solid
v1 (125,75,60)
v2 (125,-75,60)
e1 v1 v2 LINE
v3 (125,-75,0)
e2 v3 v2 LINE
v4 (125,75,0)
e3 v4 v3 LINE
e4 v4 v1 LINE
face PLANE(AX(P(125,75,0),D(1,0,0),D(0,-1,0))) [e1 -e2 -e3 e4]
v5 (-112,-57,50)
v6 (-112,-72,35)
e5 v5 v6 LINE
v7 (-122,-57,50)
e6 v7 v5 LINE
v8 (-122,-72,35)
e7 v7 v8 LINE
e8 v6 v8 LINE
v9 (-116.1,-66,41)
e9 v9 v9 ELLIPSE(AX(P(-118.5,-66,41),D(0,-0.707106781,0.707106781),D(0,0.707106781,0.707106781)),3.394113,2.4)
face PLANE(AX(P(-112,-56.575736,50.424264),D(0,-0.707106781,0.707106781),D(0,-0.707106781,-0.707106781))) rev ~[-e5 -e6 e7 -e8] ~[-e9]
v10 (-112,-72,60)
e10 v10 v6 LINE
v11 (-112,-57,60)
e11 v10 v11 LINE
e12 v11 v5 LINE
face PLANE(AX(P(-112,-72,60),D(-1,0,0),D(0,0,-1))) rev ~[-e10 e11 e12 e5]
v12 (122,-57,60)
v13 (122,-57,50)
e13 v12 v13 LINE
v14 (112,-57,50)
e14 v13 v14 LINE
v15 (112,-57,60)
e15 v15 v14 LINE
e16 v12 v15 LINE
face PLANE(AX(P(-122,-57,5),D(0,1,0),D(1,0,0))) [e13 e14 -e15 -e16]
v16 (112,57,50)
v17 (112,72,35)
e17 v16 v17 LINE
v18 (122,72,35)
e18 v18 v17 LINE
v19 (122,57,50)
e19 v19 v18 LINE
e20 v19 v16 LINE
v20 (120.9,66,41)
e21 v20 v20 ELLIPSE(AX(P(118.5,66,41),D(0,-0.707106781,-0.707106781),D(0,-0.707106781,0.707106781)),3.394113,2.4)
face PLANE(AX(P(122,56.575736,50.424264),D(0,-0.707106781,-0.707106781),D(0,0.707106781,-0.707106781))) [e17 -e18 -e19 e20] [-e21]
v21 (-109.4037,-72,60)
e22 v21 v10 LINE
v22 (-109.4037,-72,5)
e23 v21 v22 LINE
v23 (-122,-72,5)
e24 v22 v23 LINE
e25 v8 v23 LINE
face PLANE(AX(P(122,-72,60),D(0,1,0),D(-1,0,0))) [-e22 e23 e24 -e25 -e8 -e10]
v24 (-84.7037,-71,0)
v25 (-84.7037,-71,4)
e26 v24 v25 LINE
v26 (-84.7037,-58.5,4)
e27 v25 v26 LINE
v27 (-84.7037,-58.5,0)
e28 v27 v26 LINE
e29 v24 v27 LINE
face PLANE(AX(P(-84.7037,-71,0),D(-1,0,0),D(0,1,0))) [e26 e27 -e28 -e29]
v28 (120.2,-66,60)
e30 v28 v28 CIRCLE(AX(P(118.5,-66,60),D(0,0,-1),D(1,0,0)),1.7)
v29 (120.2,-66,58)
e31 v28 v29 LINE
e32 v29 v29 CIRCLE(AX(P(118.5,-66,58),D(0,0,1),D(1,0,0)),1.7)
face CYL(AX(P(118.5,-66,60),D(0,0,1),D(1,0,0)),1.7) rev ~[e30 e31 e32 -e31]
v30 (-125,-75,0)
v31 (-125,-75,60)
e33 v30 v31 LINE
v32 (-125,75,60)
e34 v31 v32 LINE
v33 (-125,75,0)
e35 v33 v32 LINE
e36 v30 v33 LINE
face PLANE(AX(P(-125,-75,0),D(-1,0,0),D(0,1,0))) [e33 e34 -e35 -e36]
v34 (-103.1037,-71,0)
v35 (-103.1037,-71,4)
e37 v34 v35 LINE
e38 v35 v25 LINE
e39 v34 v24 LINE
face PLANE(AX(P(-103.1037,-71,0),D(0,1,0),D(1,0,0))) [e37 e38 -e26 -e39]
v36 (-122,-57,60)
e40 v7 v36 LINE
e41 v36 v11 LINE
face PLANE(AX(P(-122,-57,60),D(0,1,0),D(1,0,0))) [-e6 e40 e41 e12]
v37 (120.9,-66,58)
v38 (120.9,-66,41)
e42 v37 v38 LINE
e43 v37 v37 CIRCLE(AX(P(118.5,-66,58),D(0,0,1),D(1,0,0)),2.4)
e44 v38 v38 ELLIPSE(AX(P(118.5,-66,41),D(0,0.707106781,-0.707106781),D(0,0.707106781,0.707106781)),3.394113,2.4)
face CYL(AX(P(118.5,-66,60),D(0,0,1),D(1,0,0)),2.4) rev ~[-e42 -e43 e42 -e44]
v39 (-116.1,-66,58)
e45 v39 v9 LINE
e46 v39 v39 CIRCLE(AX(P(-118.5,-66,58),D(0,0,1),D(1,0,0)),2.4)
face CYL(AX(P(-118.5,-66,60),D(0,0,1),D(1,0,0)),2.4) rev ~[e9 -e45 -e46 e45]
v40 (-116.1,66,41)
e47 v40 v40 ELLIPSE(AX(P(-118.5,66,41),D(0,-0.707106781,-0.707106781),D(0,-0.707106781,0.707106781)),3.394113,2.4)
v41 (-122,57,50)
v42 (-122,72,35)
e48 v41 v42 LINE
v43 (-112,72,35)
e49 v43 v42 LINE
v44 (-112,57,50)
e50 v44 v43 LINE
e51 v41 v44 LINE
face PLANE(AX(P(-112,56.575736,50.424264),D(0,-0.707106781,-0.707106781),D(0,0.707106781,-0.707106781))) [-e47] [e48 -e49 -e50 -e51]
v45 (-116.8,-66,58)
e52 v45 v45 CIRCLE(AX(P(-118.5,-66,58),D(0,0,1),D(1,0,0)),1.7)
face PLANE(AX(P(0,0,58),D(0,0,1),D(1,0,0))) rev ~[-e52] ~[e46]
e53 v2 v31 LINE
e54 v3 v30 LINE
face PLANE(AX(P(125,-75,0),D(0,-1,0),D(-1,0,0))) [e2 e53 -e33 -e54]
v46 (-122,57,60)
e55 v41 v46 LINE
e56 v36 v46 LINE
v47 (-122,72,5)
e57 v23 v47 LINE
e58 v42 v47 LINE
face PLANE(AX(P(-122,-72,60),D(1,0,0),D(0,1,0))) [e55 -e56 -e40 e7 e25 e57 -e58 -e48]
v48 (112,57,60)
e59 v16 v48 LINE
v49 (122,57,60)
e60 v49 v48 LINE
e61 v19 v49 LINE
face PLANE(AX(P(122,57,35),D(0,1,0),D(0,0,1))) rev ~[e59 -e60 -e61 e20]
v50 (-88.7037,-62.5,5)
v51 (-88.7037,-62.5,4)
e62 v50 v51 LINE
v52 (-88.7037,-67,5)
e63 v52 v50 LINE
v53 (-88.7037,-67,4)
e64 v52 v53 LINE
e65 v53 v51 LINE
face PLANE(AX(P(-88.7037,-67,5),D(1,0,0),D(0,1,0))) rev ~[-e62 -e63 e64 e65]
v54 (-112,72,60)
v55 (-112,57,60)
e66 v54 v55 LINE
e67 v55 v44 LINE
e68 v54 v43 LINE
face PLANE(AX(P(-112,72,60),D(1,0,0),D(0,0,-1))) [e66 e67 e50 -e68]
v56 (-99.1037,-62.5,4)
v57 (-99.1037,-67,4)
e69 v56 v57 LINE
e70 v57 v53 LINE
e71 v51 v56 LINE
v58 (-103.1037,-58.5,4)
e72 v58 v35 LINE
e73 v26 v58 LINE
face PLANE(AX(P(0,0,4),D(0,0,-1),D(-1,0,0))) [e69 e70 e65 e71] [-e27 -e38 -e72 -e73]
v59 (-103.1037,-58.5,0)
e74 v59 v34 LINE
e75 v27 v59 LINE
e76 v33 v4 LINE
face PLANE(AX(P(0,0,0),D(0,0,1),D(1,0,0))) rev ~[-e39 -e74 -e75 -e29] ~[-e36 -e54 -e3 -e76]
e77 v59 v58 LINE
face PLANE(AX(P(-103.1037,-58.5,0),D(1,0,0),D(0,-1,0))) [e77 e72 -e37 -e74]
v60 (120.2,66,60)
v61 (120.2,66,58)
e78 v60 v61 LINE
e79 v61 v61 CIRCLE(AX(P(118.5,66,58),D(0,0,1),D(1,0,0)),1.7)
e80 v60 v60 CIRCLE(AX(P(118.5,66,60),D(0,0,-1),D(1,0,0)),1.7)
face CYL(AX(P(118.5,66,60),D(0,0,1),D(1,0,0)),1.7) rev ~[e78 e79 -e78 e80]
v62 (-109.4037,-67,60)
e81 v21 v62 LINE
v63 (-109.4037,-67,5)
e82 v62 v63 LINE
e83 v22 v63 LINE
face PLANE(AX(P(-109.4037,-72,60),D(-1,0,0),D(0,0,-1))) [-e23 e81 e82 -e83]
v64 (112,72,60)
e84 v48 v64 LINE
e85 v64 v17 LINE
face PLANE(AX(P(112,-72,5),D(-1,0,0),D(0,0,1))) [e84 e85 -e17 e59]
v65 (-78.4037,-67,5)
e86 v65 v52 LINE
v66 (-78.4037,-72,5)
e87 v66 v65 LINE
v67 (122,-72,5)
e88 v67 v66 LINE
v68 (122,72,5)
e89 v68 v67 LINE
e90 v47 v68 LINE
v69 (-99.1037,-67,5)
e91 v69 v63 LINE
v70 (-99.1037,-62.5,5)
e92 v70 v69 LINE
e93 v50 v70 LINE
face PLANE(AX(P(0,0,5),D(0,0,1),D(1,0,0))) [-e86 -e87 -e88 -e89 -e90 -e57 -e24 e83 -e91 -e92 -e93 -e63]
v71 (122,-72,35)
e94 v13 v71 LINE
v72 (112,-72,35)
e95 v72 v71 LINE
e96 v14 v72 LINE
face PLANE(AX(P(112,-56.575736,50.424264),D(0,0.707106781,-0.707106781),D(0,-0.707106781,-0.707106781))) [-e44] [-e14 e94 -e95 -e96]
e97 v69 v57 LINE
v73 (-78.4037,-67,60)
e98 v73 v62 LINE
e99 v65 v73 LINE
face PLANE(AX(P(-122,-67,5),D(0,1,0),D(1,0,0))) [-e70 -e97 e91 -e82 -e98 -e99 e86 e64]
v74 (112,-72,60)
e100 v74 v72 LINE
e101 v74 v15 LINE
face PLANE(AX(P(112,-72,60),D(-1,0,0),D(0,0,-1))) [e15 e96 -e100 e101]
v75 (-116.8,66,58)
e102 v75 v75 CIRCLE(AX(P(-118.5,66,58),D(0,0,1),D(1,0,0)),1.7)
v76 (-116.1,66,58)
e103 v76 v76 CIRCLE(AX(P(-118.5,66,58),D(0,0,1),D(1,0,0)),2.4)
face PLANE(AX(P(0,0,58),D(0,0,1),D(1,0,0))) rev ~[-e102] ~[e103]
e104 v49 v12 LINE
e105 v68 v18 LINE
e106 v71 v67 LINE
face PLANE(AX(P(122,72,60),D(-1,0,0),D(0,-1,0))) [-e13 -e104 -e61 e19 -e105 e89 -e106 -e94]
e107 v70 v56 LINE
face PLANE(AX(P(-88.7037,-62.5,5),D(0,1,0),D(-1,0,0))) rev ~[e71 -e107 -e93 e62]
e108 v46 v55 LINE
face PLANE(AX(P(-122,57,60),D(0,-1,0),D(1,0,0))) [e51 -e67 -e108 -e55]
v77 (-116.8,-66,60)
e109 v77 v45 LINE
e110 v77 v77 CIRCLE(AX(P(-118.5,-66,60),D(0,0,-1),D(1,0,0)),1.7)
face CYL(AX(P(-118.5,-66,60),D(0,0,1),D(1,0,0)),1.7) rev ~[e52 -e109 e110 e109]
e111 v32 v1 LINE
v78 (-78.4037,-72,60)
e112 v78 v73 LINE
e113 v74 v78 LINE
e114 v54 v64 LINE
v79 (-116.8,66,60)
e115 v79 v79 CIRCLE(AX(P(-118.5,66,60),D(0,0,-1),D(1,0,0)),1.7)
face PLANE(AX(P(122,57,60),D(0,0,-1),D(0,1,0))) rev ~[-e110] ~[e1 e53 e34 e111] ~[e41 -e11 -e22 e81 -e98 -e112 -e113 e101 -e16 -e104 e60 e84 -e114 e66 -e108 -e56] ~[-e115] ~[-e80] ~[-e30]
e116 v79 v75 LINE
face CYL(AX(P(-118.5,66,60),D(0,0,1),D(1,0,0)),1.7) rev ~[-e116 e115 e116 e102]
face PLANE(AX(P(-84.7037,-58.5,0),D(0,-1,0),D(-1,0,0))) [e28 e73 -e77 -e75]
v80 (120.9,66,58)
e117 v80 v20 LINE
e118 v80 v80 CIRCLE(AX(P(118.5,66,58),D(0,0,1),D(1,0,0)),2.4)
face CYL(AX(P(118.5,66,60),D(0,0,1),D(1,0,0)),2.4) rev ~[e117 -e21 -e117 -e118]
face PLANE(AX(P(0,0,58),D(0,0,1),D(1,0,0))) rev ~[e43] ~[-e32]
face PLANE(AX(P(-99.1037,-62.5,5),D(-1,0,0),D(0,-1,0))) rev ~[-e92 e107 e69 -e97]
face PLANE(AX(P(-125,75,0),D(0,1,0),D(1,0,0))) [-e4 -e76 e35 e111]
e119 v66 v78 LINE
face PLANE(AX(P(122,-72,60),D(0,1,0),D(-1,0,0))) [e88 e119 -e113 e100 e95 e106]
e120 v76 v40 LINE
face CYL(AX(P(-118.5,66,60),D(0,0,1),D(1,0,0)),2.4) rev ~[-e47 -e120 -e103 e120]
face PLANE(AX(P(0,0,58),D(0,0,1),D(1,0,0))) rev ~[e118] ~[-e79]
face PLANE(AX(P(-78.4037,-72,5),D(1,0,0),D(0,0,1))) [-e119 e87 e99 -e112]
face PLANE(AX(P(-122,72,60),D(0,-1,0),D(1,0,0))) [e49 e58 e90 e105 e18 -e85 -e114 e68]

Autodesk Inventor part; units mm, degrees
ref_plane "YZ Plane" through (0, 0, 0) normal (1, 0, 0) x (0, 1, 0)
ref_plane "XZ Plane" through (0, 0, 0) normal (0, 1, 0) x (-1, 0, 0)
ref_plane "XY Plane" through (0, 0, 0) normal (0, 0, 1) x (1, 0, 0)
sketch "Sketch7" plane through (0, 0, 0) normal (0, 0, 1) x (1, 0, 0)
  line L0 (125, -75) -> (-125, -75)
  line L1 (-125, -75) -> (-125, 75)
  line L2 (-125, 75) -> (125, 75)
  line L3 (125, 75) -> (125, -75)
  line L4 (125, -75) -> (-125, 75) construction
  line L5 (-125, -75) -> (125, 75) construction
  point P0 (0, 0)
  dimension "d15" = 250
  dimension "d16" = 150
extrude "Box Outside" add sketch "Sketch7" along normal blind 60
sketch "Sketch8" plane through (0, 0, 60) normal (0, 0, 1) x (1, 0, 0)
  line L0 (-122, 72) -> (122, 72)
  line L1 (122, 72) -> (122, -72)
  line L2 (122, -72) -> (-122, -72)
  line L3 (-122, -72) -> (-122, 72)
  line L4 (125, 75) -> (-125, 75) projected
  line L5 (-125, 75) -> (-125, -75) projected
  line L6 (-125, -75) -> (125, -75) projected
  line L7 (125, -75) -> (125, 75) projected
  point P0 (0, 0)
  dimension "d19" = 3
  dimension "d20" = 3
  dimension "d21" = 3
  dimension "d22" = 3
extrude "Box Cut" cut sketch "Sketch8" against normal blind 55 contours L0 L1 L2 L3
sketch "Sketch9" plane through (-122, -72, 60) normal (0, 1, 0) x (1, 0, 0)
  line L0 (0, 0) -> (10, 0)
  line L1 (10, 0) -> (10, 25)
  line L2 (10, 25) -> (0, 25)
  line L3 (0, 25) -> (0, 0)
  point P0 (122, 60)
  dimension "d25" = 10
  dimension "d26" = 25
extrude "ScrewHole Box LB" add sketch "Sketch9" along normal blind 15
sketch "Sketch10" plane through (-122, -72, 5) normal (0, 1, 0) x (1, 0, 0)
  line L0 (244, -55) -> (244, 0) projected
  line L1 (244, -55) -> (234, -55)
  line L2 (234, -55) -> (234, -30)
  line L3 (234, -30) -> (244, -30)
  line L4 (244, -30) -> (244, -55)
  point P0 (122, 5)
  dimension "d29" = 10
  dimension "d30" = 25
extrude "ScrewHole Box RB" add sketch "Sketch10" along normal blind 15
sketch "Sketch11" plane through (-122, 72, 60) normal (0, -1, 0) x (1, 0, 0)
  line L0 (0, 0) -> (244, 0) projected
  line L1 (0, 0) -> (10, 0)
  line L2 (10, 0) -> (10, -25)
  line L3 (10, -25) -> (0, -25)
  line L4 (0, -25) -> (0, 0)
  point P0 (122, -60)
  dimension "d33" = 10
  dimension "d34" = 25
extrude "ScrewHole Box LU" add sketch "Sketch11" along normal blind 15
sketch "Sketch13" plane through (122, -72, 5) normal (-1, 0, 0) x (0, 0, 1)
  line L0 (55, 144) -> (0, 144) projected
  line L1 (55, 144) -> (30, 144)
  line L2 (30, 144) -> (30, 129)
  line L3 (30, 129) -> (55, 129)
  line L4 (55, 129) -> (55, 144)
  point P0 (-5, 72)
  dimension "d37" = 25
  dimension "d38" = 15
extrude "ScrewHole Box RU" add sketch "Sketch13" along normal blind 10
sketch "Sketch27" plane through (0, 0, 60) normal (0, 0, 1) x (1, 0, 0)
  line L0 (-112, -72) -> (-112, -57) projected
  line L1 (-125, 75) -> (-125, -75) projected
  line L2 (-112, -57) -> (-125, -57)
  line L3 (-125, -57) -> (-125, -75)
  line L4 (-125, -75) -> (-112, -75)
  line L5 (-112, -75) -> (-112, -57)
  line L6 (-112, -57) -> (-125, -75)
  line L7 (-112, -75) -> (-125, -57)
  circle A0 centre (-118.5, -66) radius 2.4
  point P0 (0, 0)
  dimension "d84" = 4.8
extrude "Outside ScrewHole LB" cut sketch "Sketch27" against normal blind 26 contours A0 L7 L6 | L6 L7 A0 | A0 L6 L7 | L7 L6 A0
sketch "Sketch29" plane through (0, 0, 60) normal (0, 0, 1) x (1, 0, 0)
  line L0 (-112, -72) -> (-112, -57) projected
  line L1 (-125, -75) -> (125, -75) projected
  line L2 (-112, -57) -> (-125, -57)
  line L3 (-125, -57) -> (-125, -75)
  line L4 (-125, -75) -> (-112, -75)
  line L5 (-112, -75) -> (-112, -57)
  line L6 (-112, -57) -> (-125, -75)
  circle A0 centre (-118.5, -66) radius 2.4
  point P0 (0, 0)
extrude "ScrewRibbon LB" add sketch "Sketch29" against normal blind 2 contours A0 L6 | L6 A0
sketch "Sketch30" plane through (0, 0, 60) normal (0, 0, 1) x (1, 0, 0)
  line L0 (-122, -57) -> (-112, -57) projected
  line L1 (-125, -75) -> (125, -75) projected
  line L2 (-112, -57) -> (-125, -57)
  line L3 (-125, -57) -> (-125, -75)
  line L4 (-125, -75) -> (-112, -75)
  line L5 (-112, -75) -> (-112, -57)
  line L6 (-112, -57) -> (-125, -75)
  circle A0 centre (-118.5, -66) radius 1.7
  point P0 (0, 0)
  dimension "d92" = 3.4
extrude "Inside ScrewHole LB" cut sketch "Sketch30" against normal blind 24 contours A0 L6 | L6 A0
sketch "Sketch31" plane through (0, 0, 60) normal (0, 0, 1) x (1, 0, 0)
  line L0 (-125, 75) -> (-125, -75) projected
  line L1 (-112, 57) -> (-122, 57) projected
  line L2 (-125, 75) -> (-112, 75)
  line L3 (-112, 75) -> (-112, 57)
  line L4 (-112, 57) -> (-125, 57)
  line L5 (-125, 57) -> (-125, 75)
  line L6 (-125, 75) -> (-112, 57)
  circle A0 centre (-118.5, 66) radius 2.4
  point P0 (0, 0)
  dimension "d95" = 4.8
extrude "Outside ScrewHole LU" cut sketch "Sketch31" against normal blind 24 contours A0 L6 | L6 A0
sketch "Sketch32" plane through (0, 0, 60) normal (0, 0, 1) x (1, 0, 0)
  line L0 (-122, 57) -> (-112, 57) projected
  line L1 (-125, 75) -> (-125, -75) projected
  line L2 (-112, 57) -> (-125, 57)
  line L3 (-125, 57) -> (-125, 75)
  line L4 (-125, 75) -> (-112, 75)
  line L5 (-112, 75) -> (-112, 57)
  line L6 (-112, 75) -> (-125, 57)
  circle A0 centre (-118.5, 66) radius 2.4
  point P0 (0, 0)
  dimension "d98" = 4.8
extrude "ScrewRibbon LU" add sketch "Sketch32" against normal blind 2 contours A0 L6 | L6 A0
sketch "Sketch33" plane through (0, 0, 60) normal (0, 0, 1) x (1, 0, 0)
  line L0 (125, 75) -> (-125, 75) projected
  line L1 (-112, 57) -> (-122, 57) projected
  line L2 (-125, 75) -> (-112, 75)
  line L3 (-112, 75) -> (-112, 57)
  line L4 (-112, 57) -> (-125, 57)
  line L5 (-125, 57) -> (-125, 75)
  line L6 (-125, 75) -> (-112, 57)
  circle A0 centre (-118.5, 66) radius 1.7
  point P0 (0, 0)
  dimension "d101" = 3.4
extrude "Inside ScrewHole LU" cut sketch "Sketch33" against normal blind 21.75 contours A0 L6 | L6 A0
sketch "Sketch34" plane through (0, 0, 60) normal (0, 0, 1) x (1, 0, 0)
  line L0 (112, 57) -> (112, 72) projected
  line L1 (125, 75) -> (-125, 75) projected
  line L2 (112, 57) -> (125, 57)
  line L3 (125, 57) -> (125, 75)
  line L4 (125, 75) -> (112, 75)
  line L5 (112, 75) -> (112, 57)
  line L6 (125, 75) -> (112, 57)
  circle A0 centre (118.5, 66) radius 2.4
  point P0 (0, 0)
  dimension "d104" = 4.8
extrude "Outside ScrewHole RU" cut sketch "Sketch34" against normal blind 37 contours A0 L6 | L6 A0
sketch "Sketch35" plane through (0, 0, 60) normal (0, 0, 1) x (1, 0, 0)
  line L0 (125, -75) -> (125, 75) projected
  line L1 (122, 57) -> (112, 57) projected
  line L2 (125, 75) -> (112, 75)
  line L3 (112, 75) -> (112, 57)
  line L4 (112, 57) -> (125, 57)
  line L5 (125, 57) -> (125, 75)
  line L6 (125, 75) -> (-125, 75) projected
  line L7 (125, 75) -> (112, 57)
  circle A0 centre (118.5, 66) radius 2.4
  point P0 (0, 0)
  dimension "d107" = 4.8
extrude "ScrewRibbon RU" add sketch "Sketch35" against normal blind 2 contours A0 L7 | L7 A0
sketch "Sketch36" plane through (0, 0, 60) normal (0, 0, 1) x (1, 0, 0)
  line L0 (122, 57) -> (112, 57) projected
  line L1 (125, -75) -> (125, 75) projected
  line L2 (112, 57) -> (125, 57)
  line L3 (125, 57) -> (125, 75)
  line L4 (125, 75) -> (112, 75)
  line L5 (112, 75) -> (112, 57)
  line L6 (112, 57) -> (125, 75)
  circle A0 centre (118.5, 66) radius 2.4 projected
  circle A1 centre (118.5, 66) radius 1.7
  point P0 (0, 0)
  dimension "d110" = 3.4
extrude "Inside ScrewHole RU" cut sketch "Sketch36" against normal blind 20 contours A1 L6 | L6 A1
sketch "Sketch37" plane through (0, 0, 60) normal (0, 0, 1) x (1, 0, 0)
  line L0 (125, -75) -> (125, 75) projected
  line L1 (112, -72) -> (112, -57) projected
  line L2 (125, -75) -> (112, -75)
  line L3 (112, -75) -> (112, -57)
  line L4 (112, -57) -> (125, -57)
  line L5 (125, -57) -> (125, -75)
  line L6 (112, -75) -> (125, -57)
  circle A0 centre (118.5, -66) radius 2.4
  point P0 (0, 0)
  dimension "d113" = 4.8
extrude "Outside ScrewHole RB" cut sketch "Sketch37" against normal blind 27.5 contours A0 L6 | L6 A0
sketch "Sketch38" plane through (0, 0, 60) normal (0, 0, 1) x (1, 0, 0)
  line L0 (122, -57) -> (112, -57) projected
  line L1 (125, -75) -> (125, 75) projected
  line L2 (112, -57) -> (125, -57)
  line L3 (125, -57) -> (125, -75)
  line L4 (125, -75) -> (112, -75)
  line L5 (112, -75) -> (112, -57)
  line L6 (125, -57) -> (112, -75)
  circle A0 centre (118.5, -66) radius 2.4
  point P0 (0, 0)
  dimension "d116" = 4.8
extrude "ScrewRibbon RB" add sketch "Sketch38" against normal blind 2 contours A0 L6 | L6 A0
sketch "Sketch39" plane through (0, 0, 60) normal (0, 0, 1) x (1, 0, 0)
  line L0 (112, -72) -> (112, -57) projected
  line L1 (125, -75) -> (125, 75) projected
  line L2 (112, -57) -> (125, -57)
  line L3 (125, -57) -> (125, -75)
  line L4 (125, -75) -> (112, -75)
  line L5 (112, -75) -> (112, -57)
  line L6 (112, -75) -> (125, -57)
  circle A0 centre (118.5, -66) radius 2.4 projected
  circle A1 centre (118.5, -66) radius 1.7
  point P0 (0, 0)
  dimension "d119" = 3.4
extrude "Inside ScrewHole RB" cut sketch "Sketch39" against normal blind 20 contours A1 L6 | L6 A1
sketch "Sketch42" plane through (-122, -72, 5) normal (0, 1, 0) x (1, 0, 0)
  line L0 (244, 0) -> (0, 0) projected
  line L1 (12.5963, 0) -> (43.5963, 0)
  line L2 (43.5963, 0) -> (43.5963, -55)
  line L3 (43.5963, -55) -> (12.5963, -55)
  line L4 (12.5963, -55) -> (12.5963, 0)
  point P0 (122, 5)
  point P1 (43.5963, 0)
  dimension "d134" = 31
  dimension "d135" = 55
extrude "ESPHolder" add sketch "Sketch42" along normal blind 5
sketch "Sketch43" plane through (0, 0, 5) normal (0, 0, 1) x (1, 0, 0)
  line L0 (-109.4037, -67) -> (-78.4037, -67) projected
  line L1 (-99.1037, -67) -> (-88.7037, -67)
  line L2 (-88.7037, -67) -> (-88.7037, -62.5)
  line L3 (-88.7037, -62.5) -> (-99.1037, -62.5)
  line L4 (-99.1037, -62.5) -> (-99.1037, -67)
  line L5 (-78.4037, -67) -> (-109.4037, -67)
  line L6 (-109.4037, -67) -> (-109.4037, -51.7804)
  line L7 (-109.4037, -51.7804) -> (-78.4037, -51.7804)
  line L8 (-78.4037, -51.7804) -> (-78.4037, -67)
  point P0 (0, 0)
  dimension "d138" = 10.3
  dimension "d139" = 10.3
  dimension "d140" = 4.5
extrude "PortHole" cut sketch "Sketch43" against normal through all contours L4 L3 L2 L0
sketch "Sketch44" plane through (0, 0, 0) normal (0, 0, -1) x (-1, 0, 0)
  line L0 (84.7037, -58.5) -> (103.1037, -58.5)
  line L1 (103.1037, -58.5) -> (103.1037, -71)
  line L2 (103.1037, -71) -> (84.7037, -71)
  line L3 (84.7037, -71) -> (84.7037, -58.5)
  line L4 (88.7037, -62.5) -> (99.1037, -62.5) projected
  line L5 (99.1037, -67) -> (88.7037, -67) projected
  line L6 (99.1037, -62.5) -> (99.1037, -67) projected
  line L7 (88.7037, -67) -> (88.7037, -62.5) projected
  point P0 (0, 0)
  dimension "d143" = 4
  dimension "d144" = 4
  dimension "d145" = 4
  dimension "d146" = 4
extrude "Extrusion29" cut sketch "Sketch44" against normal blind 4
chamfer "Chamfer1" distance 15 angle 45 1 edges at (-117, -57, 35)
chamfer "Chamfer2" distance 15 angle 45 1 edges at (-117, 57, 35)
chamfer "Chamfer3" distance 15 angle 45 1 edges at (117, 57, 35)
chamfer "Chamfer4" distance 15 angle 45 1 edges at (117, -57, 35)
properties part number "Box2"
